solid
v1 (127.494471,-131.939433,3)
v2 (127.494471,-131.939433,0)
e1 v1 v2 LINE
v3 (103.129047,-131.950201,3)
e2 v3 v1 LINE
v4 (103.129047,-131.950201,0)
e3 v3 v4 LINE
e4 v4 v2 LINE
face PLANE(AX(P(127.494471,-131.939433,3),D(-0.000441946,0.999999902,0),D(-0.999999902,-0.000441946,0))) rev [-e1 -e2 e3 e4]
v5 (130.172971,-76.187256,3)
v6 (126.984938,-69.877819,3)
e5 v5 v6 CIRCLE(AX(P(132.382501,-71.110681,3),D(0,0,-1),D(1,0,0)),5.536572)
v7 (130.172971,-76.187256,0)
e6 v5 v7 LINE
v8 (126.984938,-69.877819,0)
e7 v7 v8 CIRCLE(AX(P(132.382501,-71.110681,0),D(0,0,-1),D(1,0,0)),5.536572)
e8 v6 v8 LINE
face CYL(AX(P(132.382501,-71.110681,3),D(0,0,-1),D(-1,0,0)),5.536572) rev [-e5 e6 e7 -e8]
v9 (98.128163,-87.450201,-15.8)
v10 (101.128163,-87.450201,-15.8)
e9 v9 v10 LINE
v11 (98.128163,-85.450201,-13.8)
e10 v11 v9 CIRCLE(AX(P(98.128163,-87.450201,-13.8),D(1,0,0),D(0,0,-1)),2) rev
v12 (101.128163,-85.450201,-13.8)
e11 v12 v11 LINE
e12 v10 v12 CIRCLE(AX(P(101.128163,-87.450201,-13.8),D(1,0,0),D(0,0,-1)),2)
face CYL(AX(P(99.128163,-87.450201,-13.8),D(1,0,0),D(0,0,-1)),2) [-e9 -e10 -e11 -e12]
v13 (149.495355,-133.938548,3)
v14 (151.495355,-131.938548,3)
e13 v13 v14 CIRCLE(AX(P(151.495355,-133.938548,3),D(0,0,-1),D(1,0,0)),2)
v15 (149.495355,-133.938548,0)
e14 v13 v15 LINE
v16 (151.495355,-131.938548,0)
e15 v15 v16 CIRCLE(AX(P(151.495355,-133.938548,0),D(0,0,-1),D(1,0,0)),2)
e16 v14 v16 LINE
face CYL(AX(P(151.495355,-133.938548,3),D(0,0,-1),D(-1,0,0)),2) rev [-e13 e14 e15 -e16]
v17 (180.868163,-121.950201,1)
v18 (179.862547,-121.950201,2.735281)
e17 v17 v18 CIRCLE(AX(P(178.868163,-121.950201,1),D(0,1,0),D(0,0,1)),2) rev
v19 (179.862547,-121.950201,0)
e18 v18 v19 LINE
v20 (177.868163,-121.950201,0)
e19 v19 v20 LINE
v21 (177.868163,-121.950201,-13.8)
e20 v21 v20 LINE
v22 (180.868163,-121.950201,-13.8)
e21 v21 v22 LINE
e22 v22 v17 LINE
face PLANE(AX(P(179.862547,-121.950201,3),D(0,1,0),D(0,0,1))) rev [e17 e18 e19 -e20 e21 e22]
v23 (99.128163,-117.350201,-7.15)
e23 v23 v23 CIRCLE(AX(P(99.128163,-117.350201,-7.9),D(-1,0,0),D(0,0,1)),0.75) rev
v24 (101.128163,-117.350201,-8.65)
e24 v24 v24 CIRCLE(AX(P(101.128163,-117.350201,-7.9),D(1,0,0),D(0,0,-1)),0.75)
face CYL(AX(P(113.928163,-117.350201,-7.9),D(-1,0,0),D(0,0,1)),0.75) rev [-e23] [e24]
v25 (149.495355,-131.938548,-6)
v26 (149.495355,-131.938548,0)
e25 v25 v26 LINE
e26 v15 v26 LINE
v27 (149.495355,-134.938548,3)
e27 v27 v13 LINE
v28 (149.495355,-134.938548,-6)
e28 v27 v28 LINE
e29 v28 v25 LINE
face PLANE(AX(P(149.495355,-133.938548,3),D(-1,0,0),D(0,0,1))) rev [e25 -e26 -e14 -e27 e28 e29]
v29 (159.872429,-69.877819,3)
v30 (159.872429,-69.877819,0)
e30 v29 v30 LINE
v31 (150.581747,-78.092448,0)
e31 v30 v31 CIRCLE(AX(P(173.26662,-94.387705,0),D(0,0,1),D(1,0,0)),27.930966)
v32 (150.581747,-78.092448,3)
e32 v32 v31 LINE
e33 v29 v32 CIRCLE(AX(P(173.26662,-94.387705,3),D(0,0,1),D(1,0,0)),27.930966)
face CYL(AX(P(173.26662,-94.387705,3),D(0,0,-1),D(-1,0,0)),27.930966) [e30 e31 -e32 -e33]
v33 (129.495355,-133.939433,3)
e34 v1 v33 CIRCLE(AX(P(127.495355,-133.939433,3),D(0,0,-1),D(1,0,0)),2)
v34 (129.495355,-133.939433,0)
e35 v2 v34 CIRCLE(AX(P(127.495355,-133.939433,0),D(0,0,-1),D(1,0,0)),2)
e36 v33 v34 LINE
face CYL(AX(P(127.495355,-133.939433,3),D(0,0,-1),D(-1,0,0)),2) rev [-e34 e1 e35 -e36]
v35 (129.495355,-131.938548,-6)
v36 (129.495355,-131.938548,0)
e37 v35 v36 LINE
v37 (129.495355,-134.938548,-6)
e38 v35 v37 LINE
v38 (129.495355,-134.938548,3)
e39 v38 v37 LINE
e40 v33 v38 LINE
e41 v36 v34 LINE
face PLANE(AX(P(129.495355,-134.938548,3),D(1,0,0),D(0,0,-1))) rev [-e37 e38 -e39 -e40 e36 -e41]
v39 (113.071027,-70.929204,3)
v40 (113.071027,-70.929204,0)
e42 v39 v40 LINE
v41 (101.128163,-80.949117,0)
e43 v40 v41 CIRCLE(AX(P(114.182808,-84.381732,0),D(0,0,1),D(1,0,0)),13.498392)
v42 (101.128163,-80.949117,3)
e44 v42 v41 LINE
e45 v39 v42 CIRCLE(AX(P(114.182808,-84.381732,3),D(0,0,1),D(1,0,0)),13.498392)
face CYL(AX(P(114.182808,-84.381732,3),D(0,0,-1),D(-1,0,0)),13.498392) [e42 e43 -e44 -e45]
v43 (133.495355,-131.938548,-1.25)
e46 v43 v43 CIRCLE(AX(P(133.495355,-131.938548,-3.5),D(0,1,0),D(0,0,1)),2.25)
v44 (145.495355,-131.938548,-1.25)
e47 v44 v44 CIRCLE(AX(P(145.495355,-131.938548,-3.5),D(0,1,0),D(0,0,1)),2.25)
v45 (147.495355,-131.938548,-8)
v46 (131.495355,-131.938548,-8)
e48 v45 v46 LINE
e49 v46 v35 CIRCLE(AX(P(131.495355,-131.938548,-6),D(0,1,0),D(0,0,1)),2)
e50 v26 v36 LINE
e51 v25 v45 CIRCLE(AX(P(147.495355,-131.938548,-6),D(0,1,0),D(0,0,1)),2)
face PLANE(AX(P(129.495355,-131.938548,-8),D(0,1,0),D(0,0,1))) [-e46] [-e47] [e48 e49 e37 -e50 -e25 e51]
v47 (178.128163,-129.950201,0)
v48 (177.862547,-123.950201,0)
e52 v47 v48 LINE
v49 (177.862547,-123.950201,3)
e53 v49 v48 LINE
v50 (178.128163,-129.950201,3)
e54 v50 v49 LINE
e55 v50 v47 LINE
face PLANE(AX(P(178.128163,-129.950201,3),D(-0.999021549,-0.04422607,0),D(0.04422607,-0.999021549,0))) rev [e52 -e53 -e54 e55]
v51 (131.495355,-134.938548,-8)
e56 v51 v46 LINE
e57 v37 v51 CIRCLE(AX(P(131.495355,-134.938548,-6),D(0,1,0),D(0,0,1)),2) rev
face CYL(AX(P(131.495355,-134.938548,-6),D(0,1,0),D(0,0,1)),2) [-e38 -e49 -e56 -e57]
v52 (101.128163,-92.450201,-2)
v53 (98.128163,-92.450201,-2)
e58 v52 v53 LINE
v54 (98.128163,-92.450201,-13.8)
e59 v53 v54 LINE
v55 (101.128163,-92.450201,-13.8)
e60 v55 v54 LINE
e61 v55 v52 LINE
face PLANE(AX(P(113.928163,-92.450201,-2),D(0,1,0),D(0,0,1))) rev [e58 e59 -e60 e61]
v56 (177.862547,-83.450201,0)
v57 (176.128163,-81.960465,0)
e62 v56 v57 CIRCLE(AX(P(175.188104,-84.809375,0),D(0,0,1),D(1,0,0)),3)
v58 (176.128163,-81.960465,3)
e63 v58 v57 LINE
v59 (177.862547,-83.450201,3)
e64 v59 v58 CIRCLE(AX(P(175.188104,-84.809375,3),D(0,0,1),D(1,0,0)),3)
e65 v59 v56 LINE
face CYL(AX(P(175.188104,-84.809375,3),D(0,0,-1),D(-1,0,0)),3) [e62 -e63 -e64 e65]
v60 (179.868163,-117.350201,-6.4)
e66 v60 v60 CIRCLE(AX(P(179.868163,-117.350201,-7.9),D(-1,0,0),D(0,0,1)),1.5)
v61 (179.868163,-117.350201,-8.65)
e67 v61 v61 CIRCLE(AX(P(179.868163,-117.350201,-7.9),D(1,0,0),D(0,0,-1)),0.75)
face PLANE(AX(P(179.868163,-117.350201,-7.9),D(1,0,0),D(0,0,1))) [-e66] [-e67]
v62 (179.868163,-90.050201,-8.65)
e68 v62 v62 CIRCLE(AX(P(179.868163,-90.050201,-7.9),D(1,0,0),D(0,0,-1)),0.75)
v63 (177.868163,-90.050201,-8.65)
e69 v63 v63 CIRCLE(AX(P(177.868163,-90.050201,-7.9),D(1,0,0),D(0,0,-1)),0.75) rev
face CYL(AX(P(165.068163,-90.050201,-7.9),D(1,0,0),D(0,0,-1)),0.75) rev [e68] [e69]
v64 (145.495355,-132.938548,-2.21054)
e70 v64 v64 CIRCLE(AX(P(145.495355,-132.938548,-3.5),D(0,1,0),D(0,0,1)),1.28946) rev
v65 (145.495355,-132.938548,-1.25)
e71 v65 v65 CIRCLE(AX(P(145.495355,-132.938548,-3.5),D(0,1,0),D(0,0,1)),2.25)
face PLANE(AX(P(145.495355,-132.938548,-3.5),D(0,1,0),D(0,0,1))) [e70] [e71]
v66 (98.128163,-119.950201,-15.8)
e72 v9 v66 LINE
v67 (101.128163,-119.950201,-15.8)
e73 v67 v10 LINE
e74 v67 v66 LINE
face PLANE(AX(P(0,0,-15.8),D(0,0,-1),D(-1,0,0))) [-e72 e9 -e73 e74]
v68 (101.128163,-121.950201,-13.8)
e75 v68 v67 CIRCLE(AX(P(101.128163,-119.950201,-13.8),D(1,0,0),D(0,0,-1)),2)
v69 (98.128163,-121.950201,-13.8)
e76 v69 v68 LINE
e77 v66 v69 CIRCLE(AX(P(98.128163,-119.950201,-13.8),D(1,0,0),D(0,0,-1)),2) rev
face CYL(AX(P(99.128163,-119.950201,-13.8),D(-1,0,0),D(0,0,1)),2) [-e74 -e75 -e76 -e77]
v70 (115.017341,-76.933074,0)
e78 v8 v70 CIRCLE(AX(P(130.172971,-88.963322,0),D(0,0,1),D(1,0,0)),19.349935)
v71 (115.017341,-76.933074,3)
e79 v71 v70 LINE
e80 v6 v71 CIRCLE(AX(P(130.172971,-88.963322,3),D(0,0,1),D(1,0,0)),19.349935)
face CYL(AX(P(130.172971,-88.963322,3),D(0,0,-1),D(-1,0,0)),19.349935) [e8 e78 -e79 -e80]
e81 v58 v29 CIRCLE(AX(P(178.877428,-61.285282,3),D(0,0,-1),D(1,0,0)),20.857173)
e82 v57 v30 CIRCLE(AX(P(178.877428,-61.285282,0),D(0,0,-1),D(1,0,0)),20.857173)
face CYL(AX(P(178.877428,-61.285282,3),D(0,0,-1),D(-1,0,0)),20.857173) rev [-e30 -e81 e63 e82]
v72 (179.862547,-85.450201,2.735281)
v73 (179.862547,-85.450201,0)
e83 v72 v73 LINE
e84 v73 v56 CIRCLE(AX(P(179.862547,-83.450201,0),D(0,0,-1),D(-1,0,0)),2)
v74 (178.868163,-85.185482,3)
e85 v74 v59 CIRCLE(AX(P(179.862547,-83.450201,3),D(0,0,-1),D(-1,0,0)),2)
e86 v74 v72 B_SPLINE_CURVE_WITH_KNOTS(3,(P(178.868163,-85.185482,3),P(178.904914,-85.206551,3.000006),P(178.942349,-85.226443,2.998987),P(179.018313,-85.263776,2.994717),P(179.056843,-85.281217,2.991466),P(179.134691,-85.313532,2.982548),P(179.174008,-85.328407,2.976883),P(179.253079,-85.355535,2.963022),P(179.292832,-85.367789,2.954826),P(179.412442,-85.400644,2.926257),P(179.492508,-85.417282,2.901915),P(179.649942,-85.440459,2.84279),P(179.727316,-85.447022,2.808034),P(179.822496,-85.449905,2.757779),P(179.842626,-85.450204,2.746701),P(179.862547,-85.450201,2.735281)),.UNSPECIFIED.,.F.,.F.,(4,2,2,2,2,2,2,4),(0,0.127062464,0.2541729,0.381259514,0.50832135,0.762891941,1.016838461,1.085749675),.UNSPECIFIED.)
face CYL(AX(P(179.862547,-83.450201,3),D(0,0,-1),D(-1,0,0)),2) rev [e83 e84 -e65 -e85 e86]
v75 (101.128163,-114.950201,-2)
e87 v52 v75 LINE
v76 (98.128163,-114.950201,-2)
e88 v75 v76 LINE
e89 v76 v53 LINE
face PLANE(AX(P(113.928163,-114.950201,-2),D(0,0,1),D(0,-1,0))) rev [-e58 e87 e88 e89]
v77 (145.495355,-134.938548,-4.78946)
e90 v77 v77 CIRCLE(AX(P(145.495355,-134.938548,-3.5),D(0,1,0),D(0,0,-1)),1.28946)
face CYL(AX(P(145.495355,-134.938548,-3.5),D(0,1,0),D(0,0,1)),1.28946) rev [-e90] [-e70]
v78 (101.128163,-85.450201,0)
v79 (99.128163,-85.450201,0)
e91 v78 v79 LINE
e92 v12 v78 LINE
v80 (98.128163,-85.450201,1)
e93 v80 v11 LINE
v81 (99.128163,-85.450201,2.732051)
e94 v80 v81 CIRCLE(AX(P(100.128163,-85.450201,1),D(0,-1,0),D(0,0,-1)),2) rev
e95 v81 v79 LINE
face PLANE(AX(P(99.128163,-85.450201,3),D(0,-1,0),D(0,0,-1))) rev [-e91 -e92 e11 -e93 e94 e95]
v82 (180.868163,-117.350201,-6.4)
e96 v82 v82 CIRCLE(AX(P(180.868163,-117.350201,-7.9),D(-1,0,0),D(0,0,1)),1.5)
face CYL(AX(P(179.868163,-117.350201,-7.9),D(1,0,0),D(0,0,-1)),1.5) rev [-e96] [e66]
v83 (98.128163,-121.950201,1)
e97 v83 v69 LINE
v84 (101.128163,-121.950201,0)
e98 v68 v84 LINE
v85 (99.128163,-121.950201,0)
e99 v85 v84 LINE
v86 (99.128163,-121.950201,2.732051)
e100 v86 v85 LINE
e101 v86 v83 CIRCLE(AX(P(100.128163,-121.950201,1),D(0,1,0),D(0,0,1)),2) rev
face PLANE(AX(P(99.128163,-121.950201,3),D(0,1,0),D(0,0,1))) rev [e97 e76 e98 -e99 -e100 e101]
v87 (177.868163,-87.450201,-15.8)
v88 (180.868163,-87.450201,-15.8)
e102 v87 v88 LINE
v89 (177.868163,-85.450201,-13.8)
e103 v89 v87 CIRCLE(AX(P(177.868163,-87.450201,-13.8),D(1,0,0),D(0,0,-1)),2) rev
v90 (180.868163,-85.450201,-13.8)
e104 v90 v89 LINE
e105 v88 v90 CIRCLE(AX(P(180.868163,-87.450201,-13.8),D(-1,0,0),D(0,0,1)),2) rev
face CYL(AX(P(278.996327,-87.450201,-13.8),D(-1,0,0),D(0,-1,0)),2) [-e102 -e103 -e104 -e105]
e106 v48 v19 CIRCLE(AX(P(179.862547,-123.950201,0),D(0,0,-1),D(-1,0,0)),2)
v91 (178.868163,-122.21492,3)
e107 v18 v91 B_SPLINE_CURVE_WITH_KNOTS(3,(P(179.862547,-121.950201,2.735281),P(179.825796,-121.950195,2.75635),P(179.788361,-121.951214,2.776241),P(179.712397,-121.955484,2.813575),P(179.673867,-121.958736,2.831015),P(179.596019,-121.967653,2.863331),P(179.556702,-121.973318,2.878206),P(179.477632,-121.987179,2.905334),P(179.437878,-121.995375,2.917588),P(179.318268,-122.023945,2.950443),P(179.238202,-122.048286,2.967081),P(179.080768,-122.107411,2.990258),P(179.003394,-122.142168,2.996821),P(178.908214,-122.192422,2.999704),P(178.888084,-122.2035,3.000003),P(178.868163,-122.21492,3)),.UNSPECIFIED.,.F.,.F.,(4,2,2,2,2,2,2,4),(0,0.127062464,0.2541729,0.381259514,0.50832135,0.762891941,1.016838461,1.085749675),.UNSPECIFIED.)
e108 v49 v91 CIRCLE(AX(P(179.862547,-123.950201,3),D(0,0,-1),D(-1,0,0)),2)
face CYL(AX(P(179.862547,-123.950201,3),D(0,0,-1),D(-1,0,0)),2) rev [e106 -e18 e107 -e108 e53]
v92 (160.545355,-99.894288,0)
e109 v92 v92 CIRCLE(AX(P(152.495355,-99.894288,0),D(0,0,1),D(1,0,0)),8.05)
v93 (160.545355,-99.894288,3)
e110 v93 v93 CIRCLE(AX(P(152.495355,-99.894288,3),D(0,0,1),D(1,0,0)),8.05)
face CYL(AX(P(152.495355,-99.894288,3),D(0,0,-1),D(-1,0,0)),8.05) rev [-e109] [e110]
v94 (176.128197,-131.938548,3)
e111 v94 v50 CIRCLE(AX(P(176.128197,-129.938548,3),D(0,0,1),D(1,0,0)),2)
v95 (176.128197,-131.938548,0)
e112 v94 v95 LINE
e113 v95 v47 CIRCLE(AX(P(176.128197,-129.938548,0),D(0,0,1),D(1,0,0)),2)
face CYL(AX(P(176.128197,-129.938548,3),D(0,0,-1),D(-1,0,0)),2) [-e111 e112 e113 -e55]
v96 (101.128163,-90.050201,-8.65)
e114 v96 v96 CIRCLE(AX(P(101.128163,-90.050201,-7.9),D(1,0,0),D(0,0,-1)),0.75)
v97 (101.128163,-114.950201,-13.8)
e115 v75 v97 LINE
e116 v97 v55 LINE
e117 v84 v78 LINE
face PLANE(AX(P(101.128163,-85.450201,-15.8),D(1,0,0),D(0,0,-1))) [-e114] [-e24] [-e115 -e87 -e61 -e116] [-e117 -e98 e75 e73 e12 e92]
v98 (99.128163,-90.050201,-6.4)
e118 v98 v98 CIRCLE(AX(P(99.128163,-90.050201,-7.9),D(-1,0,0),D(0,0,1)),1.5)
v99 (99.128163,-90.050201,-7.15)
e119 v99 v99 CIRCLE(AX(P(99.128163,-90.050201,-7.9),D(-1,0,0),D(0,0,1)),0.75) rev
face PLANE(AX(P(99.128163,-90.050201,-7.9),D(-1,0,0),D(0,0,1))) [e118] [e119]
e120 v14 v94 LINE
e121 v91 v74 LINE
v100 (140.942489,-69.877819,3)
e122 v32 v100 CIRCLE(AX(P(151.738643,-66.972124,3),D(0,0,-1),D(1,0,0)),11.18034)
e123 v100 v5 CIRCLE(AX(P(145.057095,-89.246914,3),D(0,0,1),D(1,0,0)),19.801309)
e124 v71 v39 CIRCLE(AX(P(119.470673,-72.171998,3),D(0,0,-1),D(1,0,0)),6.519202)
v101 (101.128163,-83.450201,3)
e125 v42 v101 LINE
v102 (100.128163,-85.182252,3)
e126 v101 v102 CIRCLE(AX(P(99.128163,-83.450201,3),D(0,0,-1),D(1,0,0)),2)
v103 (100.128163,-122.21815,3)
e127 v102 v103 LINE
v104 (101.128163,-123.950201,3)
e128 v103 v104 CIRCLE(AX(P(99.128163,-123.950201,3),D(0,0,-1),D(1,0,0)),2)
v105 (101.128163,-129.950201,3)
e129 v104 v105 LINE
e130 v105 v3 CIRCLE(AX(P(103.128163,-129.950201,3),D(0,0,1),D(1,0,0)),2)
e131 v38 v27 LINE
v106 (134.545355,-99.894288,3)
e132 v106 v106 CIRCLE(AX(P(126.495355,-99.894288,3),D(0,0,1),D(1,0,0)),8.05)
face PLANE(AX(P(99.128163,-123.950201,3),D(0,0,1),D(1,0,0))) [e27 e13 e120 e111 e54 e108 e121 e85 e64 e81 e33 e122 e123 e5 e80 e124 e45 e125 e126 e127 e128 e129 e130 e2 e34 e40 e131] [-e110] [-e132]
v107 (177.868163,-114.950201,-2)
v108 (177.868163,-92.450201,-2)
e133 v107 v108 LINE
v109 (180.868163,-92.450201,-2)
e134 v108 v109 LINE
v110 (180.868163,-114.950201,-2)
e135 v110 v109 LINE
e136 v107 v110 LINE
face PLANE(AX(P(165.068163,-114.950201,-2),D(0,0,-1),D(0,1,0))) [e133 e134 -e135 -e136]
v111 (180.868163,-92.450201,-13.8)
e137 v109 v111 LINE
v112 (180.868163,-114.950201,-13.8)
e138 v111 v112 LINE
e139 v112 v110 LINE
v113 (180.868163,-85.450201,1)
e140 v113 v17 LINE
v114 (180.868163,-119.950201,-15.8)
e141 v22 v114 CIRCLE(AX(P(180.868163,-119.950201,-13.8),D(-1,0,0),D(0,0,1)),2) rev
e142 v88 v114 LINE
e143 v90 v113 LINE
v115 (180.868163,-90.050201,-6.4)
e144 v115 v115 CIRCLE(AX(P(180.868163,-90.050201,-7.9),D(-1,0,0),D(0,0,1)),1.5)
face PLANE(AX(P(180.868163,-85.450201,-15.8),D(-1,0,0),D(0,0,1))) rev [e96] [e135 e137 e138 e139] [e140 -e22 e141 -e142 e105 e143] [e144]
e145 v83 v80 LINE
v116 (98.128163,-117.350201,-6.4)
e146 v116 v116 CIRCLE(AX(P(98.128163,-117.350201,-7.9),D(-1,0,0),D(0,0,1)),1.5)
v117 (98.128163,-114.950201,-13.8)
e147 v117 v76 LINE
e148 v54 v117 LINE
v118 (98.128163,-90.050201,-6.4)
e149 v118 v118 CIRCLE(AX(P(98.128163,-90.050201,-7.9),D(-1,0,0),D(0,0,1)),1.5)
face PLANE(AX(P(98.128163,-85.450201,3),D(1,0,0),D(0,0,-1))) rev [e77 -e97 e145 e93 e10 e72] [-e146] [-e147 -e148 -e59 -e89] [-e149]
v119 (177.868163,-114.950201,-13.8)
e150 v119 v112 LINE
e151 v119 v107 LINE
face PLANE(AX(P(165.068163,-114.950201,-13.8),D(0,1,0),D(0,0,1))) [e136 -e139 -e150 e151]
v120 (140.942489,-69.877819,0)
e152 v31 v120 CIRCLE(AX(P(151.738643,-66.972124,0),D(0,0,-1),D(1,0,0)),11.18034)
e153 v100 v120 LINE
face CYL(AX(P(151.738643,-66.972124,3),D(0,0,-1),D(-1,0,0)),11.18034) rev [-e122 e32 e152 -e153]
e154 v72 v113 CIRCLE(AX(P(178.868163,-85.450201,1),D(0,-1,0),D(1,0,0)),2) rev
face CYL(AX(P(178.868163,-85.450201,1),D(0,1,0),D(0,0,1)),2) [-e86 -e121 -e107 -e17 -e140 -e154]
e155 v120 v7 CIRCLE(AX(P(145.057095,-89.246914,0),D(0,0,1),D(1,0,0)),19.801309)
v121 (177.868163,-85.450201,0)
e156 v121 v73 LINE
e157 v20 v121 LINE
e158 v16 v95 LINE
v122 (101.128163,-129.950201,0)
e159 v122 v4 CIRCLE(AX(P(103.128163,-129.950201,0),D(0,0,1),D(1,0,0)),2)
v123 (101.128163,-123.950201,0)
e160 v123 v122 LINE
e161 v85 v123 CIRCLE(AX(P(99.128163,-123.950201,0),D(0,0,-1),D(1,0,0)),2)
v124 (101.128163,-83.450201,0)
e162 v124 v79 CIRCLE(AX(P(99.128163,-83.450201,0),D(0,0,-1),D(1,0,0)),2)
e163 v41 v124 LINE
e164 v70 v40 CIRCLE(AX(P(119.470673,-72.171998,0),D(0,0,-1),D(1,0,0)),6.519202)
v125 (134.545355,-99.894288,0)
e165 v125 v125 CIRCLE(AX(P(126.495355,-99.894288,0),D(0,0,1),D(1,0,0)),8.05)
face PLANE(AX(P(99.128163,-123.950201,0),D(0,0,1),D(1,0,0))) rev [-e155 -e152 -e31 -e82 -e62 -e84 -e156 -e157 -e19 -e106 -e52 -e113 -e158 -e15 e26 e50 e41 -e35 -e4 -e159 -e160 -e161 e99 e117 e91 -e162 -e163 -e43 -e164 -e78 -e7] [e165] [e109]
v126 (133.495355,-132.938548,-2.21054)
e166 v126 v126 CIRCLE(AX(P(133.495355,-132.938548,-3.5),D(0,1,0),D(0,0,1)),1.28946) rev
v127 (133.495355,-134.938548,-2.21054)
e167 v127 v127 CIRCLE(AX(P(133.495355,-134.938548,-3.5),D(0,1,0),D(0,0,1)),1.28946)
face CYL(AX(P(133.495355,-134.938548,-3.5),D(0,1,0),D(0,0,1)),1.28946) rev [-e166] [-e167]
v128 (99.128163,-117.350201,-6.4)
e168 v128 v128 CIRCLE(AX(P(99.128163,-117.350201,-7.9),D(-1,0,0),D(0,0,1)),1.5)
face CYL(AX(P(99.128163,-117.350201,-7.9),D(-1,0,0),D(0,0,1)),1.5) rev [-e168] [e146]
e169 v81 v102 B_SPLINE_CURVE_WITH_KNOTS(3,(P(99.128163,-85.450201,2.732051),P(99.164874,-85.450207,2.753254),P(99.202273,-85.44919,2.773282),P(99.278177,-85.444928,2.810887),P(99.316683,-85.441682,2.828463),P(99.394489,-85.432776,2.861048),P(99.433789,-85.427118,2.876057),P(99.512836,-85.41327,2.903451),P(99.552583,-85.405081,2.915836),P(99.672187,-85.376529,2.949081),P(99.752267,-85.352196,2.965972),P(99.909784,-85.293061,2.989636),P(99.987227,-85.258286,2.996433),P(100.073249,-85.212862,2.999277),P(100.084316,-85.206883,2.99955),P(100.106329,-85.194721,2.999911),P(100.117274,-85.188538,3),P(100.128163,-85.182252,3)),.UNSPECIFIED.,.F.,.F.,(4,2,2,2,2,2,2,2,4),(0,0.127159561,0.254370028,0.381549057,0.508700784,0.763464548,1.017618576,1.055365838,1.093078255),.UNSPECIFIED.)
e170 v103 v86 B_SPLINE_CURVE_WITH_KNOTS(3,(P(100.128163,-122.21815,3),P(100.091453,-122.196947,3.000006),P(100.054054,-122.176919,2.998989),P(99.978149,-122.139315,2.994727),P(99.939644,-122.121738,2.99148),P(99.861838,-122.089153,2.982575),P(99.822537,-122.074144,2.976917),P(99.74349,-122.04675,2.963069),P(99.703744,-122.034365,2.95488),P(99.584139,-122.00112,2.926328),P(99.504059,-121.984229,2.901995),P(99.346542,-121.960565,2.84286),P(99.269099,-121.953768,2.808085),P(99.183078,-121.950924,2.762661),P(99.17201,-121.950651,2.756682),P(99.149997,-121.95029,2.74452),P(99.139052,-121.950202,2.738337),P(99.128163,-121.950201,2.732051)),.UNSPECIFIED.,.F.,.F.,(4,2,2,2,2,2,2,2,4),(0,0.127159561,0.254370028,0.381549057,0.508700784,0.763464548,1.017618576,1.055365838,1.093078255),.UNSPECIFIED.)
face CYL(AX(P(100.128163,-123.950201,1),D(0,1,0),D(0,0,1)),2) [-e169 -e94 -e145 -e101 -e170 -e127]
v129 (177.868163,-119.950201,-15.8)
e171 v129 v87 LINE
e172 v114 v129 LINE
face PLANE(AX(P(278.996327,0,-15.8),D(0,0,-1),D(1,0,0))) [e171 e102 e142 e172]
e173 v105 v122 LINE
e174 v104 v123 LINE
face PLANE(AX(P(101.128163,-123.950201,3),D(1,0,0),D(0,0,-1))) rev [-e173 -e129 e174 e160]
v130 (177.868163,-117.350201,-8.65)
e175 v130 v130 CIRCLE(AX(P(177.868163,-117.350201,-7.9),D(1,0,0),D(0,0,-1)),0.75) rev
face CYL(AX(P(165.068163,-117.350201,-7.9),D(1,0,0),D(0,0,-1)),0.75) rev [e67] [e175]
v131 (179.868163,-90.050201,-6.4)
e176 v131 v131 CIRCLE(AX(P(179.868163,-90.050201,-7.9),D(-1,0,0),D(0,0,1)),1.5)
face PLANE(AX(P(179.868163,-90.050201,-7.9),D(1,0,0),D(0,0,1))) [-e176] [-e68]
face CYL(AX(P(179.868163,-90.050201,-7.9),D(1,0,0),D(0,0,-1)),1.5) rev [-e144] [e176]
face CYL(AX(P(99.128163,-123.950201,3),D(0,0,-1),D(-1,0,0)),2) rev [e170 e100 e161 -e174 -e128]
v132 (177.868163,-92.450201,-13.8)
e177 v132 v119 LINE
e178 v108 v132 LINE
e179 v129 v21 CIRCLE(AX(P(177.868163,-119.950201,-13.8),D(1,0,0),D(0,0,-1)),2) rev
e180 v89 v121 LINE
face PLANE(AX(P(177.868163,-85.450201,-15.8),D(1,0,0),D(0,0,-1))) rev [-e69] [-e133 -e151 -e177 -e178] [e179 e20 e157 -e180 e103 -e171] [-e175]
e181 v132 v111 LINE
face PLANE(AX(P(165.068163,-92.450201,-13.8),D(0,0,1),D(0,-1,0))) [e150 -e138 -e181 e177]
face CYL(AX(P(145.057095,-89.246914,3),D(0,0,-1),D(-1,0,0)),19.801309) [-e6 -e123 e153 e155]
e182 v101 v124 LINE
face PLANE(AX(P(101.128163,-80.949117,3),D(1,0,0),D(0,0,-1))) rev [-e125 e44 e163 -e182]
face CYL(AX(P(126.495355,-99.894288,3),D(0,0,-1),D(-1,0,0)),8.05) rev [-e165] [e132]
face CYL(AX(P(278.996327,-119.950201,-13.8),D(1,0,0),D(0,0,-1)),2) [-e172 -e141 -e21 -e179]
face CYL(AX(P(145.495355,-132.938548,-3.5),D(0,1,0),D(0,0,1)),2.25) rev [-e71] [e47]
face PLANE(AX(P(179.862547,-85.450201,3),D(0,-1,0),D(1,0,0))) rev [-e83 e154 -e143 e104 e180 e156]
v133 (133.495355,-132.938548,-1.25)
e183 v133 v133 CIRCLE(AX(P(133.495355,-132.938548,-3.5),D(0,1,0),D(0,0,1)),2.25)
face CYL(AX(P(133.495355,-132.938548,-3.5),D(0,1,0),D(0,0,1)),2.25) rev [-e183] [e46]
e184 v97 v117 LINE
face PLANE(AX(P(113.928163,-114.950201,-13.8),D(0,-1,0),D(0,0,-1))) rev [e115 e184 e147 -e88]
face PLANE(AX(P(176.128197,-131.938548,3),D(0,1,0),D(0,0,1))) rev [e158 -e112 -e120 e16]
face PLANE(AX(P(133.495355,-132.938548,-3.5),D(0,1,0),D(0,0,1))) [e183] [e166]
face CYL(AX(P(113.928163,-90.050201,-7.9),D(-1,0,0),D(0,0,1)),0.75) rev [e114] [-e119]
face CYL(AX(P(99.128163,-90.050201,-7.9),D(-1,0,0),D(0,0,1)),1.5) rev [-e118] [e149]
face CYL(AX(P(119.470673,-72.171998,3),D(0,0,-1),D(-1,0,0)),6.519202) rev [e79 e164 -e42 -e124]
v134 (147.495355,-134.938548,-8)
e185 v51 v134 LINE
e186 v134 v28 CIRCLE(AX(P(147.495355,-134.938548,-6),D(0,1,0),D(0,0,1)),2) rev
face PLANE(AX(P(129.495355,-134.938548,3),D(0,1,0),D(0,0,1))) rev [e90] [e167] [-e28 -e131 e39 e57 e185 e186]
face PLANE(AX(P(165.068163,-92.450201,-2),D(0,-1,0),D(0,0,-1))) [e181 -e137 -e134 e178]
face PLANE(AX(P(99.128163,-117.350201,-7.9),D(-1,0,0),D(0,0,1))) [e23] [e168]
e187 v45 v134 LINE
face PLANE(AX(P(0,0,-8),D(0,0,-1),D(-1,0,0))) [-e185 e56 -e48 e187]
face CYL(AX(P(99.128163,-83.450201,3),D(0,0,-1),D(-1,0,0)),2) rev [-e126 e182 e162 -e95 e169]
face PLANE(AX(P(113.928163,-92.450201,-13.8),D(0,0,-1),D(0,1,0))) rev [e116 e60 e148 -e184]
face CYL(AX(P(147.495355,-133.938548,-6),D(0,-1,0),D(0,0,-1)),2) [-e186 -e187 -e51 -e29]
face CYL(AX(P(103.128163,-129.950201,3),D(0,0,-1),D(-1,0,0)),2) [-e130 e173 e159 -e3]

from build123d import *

# Parameters (mm, degrees)
MODEL_R                 = 8.05
SALIENTE_EXTRUIR1_DEPTH = 3
CROQUIS2_W              = 3
CROQUIS2_H              = 36.500000005
SALIENTE_EXTRUIR2_DEPTH = 18.8
REDONDEO1_R             = 2
CROQUIS3_R              = 0.75
CROQUIS3_W              = 11.8
CROQUIS3_H              = 22.5
CORTAR_EXTRUIR1_DEPTH   = 15.8
CROQUIS7_R              = 1.5
CORTAR_EXTRUIR3_DEPTH   = 1
SIMETR_A1_START         = 177.868163256
SIMETR_A1_OUTLINE_R     = 1.5
SIMETR_A1_OUTLINE_W     = 22.5
SIMETR_A1_OUTLINE_H     = 11.8
SIMETR_A1_DEPTH         = 3
SIMETR_A1_2_OUTLINE_R   = 1.5
SIMETR_A1_2_OUTLINE_R_2 = 0.75
SIMETR_A1_2_DEPTH       = 2
CROQUIS5_W              = 20
CROQUIS5_H              = 3
SALIENTE_EXTRUIR3_DEPTH = 11
REDONDEO2_R             = 2
CROQUIS6_R              = 1.289460228
CORTAR_EXTRUIR2_DEPTH   = 3
CROQUIS8_R              = 2.25
CORTAR_EXTRUIR4_DEPTH   = 1
REDONDEO3_R             = 2


# Read off the part's stored shape, not the designer's step: Simetría1
with BuildPart() as part:
    # Model → Saliente-Extruir1 (new body)
    with BuildSketch(Plane.XY):
        with BuildLine():
            Line((129.495355099, -134.938548449), (149.495355099, -134.938548449))
            Line((149.495355099, -134.938548449), (149.495355099, -133.938548449))
            ThreePointArc((149.495355099, -133.938548449), (150.081141537, -132.524334887), (151.495355099, -131.938548449))
            Line((151.495355099, -131.938548449), (176.128197203, -131.938548449))
            ThreePointArc((176.128197203, -131.938548449), (177.538284884, -131.35687589), (178.128163256, -129.950201179))
            Line((178.128163256, -129.950201179), (177.862546943, -123.950201137))
            ThreePointArc((177.862546943, -123.950201137), (178.44833338, -122.535987575), (179.862546943, -121.950201137))
            Line((179.862546943, -121.950201137), (180.862546943, -121.950201137))
            Line((180.862546943, -121.950201137), (180.862546943, -85.450201132))
            Line((180.862546943, -85.450201132), (179.862546943, -85.450201132))
            ThreePointArc((179.862546943, -85.450201132), (178.44833338, -84.864414695), (177.862546943, -83.450201132))
            ThreePointArc((177.862546943, -83.450201132), (177.142837957, -82.533630305), (176.128163256, -81.960465095))
            ThreePointArc((176.128163256, -81.960465095), (166.435178179, -78.024818287), (159.872429316, -69.877818664))
            ThreePointArc((159.872429316, -69.877818664), (154.765410937, -73.462979643), (150.58174723, -78.092447642))
            ThreePointArc((150.58174723, -78.092447642), (144.486823712, -75.481596568), (140.942488903, -69.877818664))
            ThreePointArc((140.942488903, -69.877818664), (135.047590207, -72.161784577), (130.172970832, -76.18725559))
            ThreePointArc((130.172970832, -76.18725559), (127.440920733, -73.607562885), (126.984938003, -69.877818664))
            ThreePointArc((126.984938003, -69.877818664), (120.346137898, -72.294388425), (115.017340976, -76.933073543))
            ThreePointArc((115.017340976, -76.933073543), (113.269189628, -74.182373632), (113.071027177, -70.929203673))
            ThreePointArc((113.071027177, -70.929203673), (105.5068889, -74.040793408), (101.128163256, -80.949117392))
            Line((101.128163256, -80.949117392), (101.128163256, -83.450201132))
            ThreePointArc((101.128163256, -83.450201132), (100.542376818, -84.864414695), (99.128163256, -85.450201132))
            Line((99.128163256, -85.450201132), (98.128163256, -85.450201132))
            Line((98.128163256, -85.450201132), (98.128163256, -121.950201137))
            Line((98.128163256, -121.950201137), (99.128163256, -121.950201137))
            ThreePointArc((99.128163256, -121.950201137), (100.542376818, -122.535987575), (101.128163256, -123.950201137))
            Line((101.128163256, -123.950201137), (101.128163256, -129.950201137))
            ThreePointArc((101.128163256, -129.950201137), (101.714262231, -131.364727168), (103.129047148, -131.950200942))
            Line((103.129047148, -131.950200942), (127.494471207, -131.939432732))
            ThreePointArc((127.494471207, -131.939432732), (128.909256124, -132.524906506), (129.495355099, -133.939432537))
            Line((129.495355099, -133.939432537), (129.495355099, -134.938548449))
        make_face()
        with Locations((126.495355099, -99.894288355)):
            Circle(MODEL_R, mode=Mode.SUBTRACT)
        with Locations((152.495355099, -99.894288355)):
            Circle(MODEL_R, mode=Mode.SUBTRACT)
    extrude(amount=SALIENTE_EXTRUIR1_DEPTH)

    # Croquis2 → Saliente-Extruir2 (add)
    with BuildSketch(Plane.XY.offset(3)):
        with Locations((99.628163256, -103.700201135)):
            Rectangle(CROQUIS2_W, CROQUIS2_H)
    extrude(amount=-SALIENTE_EXTRUIR2_DEPTH)

    # Redondeo1
    redondeo1_edges = [part.edges().sort_by_distance(p)[0] for p in [
        (99.628163256, -121.950201137, -15.8),
        (99.628163256, -85.450201132, -15.8),
        (98.128163256, -103.700201135, 3),
    ]]
    fillet(redondeo1_edges, radius=REDONDEO1_R)

    # Croquis3 → Cortar-Extruir1 (cut)
    with BuildSketch(Plane.ZY.offset(-98.128163256)):
        with Locations((-7.9, -117.350201137)):
            Circle(CROQUIS3_R)
        with Locations((-7.9, -90.050201137)):
            Circle(CROQUIS3_R)
        with Locations((-7.9, -103.700201137)):
            Rectangle(CROQUIS3_W, CROQUIS3_H)
    extrude(amount=-CORTAR_EXTRUIR1_DEPTH, mode=Mode.SUBTRACT)

    # Croquis7 → Cortar-Extruir3 (cut)
    with BuildSketch(Plane.ZY.offset(-98.128163256)):
        with Locations((-7.9, -90.050201137)):
            Circle(CROQUIS7_R)
        with Locations((-7.9, -117.350201137)):
            Circle(CROQUIS7_R)
    extrude(amount=-CORTAR_EXTRUIR3_DEPTH, mode=Mode.SUBTRACT)

    # Simetría1 outline → Simetría1 (add)
    with BuildSketch(Plane.YZ.offset(SIMETR_A1_START)):
        with BuildLine():
            ThreePointArc((-121.950201137, -13.8), (-121.364414699, -15.214213562), (-119.950201137, -15.8))
            Line((-119.950201137, -15.8), (-87.450201132, -15.8))
            ThreePointArc((-87.450201132, -15.8), (-86.03598757, -15.214213562), (-85.450201132, -13.8))
            Line((-85.450201132, -13.8), (-85.450201132, 3))
            Line((-85.450201132, 3), (-121.950201137, 3))
            Line((-121.950201137, 3), (-121.950201137, -13.8))
        make_face()
        with Locations((-117.350201137, -7.9)):
            Circle(SIMETR_A1_OUTLINE_R, mode=Mode.SUBTRACT)
        with Locations((-103.700201137, -7.9)):
            Rectangle(SIMETR_A1_OUTLINE_W, SIMETR_A1_OUTLINE_H, mode=Mode.SUBTRACT)
        with Locations((-90.050201137, -7.9)):
            Circle(SIMETR_A1_OUTLINE_R, mode=Mode.SUBTRACT)
    extrude(amount=SIMETR_A1_DEPTH)

    # Simetr_a1 2 outline → Simetr_a1 2 (add)
    # profile 1 of 2: a face of its own
    with BuildSketch(Plane.YZ.offset(SIMETR_A1_START)):
        with Locations((-117.350201137, -7.9)):
            Circle(SIMETR_A1_2_OUTLINE_R)
        with Locations((-117.350201137, -7.9)):
            Circle(SIMETR_A1_2_OUTLINE_R_2, mode=Mode.SUBTRACT)
    # profile 2 of 2: a face of its own
    with BuildSketch(Plane.YZ.offset(SIMETR_A1_START)):
        with Locations((-90.050201137, -7.9)):
            Circle(SIMETR_A1_2_OUTLINE_R)
        with Locations((-90.050201137, -7.9)):
            Circle(SIMETR_A1_2_OUTLINE_R_2, mode=Mode.SUBTRACT)
    extrude(amount=SIMETR_A1_2_DEPTH)

    # Croquis5 → Saliente-Extruir3 (add)
    with BuildSketch(Plane.XY.offset(3)):
        with Locations((139.495355099, -133.438548449)):
            Rectangle(CROQUIS5_W, CROQUIS5_H)
    extrude(amount=-SALIENTE_EXTRUIR3_DEPTH)

    # Redondeo2
    redondeo2_edges = [part.edges().sort_by_distance(p)[0] for p in [
        (129.495355099, -133.438548449, -8),
        (149.495355099, -133.438548449, -8),
    ]]
    fillet(redondeo2_edges, radius=REDONDEO2_R)

    # Croquis6 → Cortar-Extruir2 (cut)
    with BuildSketch(Plane(origin=(0, -131.938548449, 0), x_dir=(1, 0, 0), z_dir=(0, 1, 0))):
        with Locations(Location((133.495355099, 3.5, 0), (0, 0, 270))):
            Circle(CROQUIS6_R)
        with Locations(Location((145.495355099, 3.5, 0), (0, 0, 90))):
            Circle(CROQUIS6_R)
    extrude(amount=-CORTAR_EXTRUIR2_DEPTH, mode=Mode.SUBTRACT)

    # Croquis8 → Cortar-Extruir4 (cut)
    with BuildSketch(Plane(origin=(0, -131.938548449, 0), x_dir=(1, 0, 0), z_dir=(0, 1, 0))):
        with Locations(Location((145.495355099, 3.5, 0), (0, 0, 270))):
            Circle(CROQUIS8_R)
        with Locations(Location((133.495355099, 3.5, 0), (0, 0, 270))):
            Circle(CROQUIS8_R)
    extrude(amount=-CORTAR_EXTRUIR4_DEPTH, mode=Mode.SUBTRACT)

    # Redondeo3
    # the kernel refuses this fillet: 2 mm, written as the material it takes off along each edge
    with BuildSketch(Plane(origin=(180.868163256, -80.450201132, 3), x_dir=(-1, 0, 0), z_dir=(0, -1, 0))) as redondeo3_piece_1:
        with BuildLine():
            CenterArc((REDONDEO3_R, REDONDEO3_R), REDONDEO3_R, 180, 90)
            Line((0, REDONDEO3_R), (0, 0))
            Line((0, 0), (REDONDEO3_R, 0))
        make_face()
    extrude(amount=46.500000005, mode=Mode.SUBTRACT)


solid = part.part
